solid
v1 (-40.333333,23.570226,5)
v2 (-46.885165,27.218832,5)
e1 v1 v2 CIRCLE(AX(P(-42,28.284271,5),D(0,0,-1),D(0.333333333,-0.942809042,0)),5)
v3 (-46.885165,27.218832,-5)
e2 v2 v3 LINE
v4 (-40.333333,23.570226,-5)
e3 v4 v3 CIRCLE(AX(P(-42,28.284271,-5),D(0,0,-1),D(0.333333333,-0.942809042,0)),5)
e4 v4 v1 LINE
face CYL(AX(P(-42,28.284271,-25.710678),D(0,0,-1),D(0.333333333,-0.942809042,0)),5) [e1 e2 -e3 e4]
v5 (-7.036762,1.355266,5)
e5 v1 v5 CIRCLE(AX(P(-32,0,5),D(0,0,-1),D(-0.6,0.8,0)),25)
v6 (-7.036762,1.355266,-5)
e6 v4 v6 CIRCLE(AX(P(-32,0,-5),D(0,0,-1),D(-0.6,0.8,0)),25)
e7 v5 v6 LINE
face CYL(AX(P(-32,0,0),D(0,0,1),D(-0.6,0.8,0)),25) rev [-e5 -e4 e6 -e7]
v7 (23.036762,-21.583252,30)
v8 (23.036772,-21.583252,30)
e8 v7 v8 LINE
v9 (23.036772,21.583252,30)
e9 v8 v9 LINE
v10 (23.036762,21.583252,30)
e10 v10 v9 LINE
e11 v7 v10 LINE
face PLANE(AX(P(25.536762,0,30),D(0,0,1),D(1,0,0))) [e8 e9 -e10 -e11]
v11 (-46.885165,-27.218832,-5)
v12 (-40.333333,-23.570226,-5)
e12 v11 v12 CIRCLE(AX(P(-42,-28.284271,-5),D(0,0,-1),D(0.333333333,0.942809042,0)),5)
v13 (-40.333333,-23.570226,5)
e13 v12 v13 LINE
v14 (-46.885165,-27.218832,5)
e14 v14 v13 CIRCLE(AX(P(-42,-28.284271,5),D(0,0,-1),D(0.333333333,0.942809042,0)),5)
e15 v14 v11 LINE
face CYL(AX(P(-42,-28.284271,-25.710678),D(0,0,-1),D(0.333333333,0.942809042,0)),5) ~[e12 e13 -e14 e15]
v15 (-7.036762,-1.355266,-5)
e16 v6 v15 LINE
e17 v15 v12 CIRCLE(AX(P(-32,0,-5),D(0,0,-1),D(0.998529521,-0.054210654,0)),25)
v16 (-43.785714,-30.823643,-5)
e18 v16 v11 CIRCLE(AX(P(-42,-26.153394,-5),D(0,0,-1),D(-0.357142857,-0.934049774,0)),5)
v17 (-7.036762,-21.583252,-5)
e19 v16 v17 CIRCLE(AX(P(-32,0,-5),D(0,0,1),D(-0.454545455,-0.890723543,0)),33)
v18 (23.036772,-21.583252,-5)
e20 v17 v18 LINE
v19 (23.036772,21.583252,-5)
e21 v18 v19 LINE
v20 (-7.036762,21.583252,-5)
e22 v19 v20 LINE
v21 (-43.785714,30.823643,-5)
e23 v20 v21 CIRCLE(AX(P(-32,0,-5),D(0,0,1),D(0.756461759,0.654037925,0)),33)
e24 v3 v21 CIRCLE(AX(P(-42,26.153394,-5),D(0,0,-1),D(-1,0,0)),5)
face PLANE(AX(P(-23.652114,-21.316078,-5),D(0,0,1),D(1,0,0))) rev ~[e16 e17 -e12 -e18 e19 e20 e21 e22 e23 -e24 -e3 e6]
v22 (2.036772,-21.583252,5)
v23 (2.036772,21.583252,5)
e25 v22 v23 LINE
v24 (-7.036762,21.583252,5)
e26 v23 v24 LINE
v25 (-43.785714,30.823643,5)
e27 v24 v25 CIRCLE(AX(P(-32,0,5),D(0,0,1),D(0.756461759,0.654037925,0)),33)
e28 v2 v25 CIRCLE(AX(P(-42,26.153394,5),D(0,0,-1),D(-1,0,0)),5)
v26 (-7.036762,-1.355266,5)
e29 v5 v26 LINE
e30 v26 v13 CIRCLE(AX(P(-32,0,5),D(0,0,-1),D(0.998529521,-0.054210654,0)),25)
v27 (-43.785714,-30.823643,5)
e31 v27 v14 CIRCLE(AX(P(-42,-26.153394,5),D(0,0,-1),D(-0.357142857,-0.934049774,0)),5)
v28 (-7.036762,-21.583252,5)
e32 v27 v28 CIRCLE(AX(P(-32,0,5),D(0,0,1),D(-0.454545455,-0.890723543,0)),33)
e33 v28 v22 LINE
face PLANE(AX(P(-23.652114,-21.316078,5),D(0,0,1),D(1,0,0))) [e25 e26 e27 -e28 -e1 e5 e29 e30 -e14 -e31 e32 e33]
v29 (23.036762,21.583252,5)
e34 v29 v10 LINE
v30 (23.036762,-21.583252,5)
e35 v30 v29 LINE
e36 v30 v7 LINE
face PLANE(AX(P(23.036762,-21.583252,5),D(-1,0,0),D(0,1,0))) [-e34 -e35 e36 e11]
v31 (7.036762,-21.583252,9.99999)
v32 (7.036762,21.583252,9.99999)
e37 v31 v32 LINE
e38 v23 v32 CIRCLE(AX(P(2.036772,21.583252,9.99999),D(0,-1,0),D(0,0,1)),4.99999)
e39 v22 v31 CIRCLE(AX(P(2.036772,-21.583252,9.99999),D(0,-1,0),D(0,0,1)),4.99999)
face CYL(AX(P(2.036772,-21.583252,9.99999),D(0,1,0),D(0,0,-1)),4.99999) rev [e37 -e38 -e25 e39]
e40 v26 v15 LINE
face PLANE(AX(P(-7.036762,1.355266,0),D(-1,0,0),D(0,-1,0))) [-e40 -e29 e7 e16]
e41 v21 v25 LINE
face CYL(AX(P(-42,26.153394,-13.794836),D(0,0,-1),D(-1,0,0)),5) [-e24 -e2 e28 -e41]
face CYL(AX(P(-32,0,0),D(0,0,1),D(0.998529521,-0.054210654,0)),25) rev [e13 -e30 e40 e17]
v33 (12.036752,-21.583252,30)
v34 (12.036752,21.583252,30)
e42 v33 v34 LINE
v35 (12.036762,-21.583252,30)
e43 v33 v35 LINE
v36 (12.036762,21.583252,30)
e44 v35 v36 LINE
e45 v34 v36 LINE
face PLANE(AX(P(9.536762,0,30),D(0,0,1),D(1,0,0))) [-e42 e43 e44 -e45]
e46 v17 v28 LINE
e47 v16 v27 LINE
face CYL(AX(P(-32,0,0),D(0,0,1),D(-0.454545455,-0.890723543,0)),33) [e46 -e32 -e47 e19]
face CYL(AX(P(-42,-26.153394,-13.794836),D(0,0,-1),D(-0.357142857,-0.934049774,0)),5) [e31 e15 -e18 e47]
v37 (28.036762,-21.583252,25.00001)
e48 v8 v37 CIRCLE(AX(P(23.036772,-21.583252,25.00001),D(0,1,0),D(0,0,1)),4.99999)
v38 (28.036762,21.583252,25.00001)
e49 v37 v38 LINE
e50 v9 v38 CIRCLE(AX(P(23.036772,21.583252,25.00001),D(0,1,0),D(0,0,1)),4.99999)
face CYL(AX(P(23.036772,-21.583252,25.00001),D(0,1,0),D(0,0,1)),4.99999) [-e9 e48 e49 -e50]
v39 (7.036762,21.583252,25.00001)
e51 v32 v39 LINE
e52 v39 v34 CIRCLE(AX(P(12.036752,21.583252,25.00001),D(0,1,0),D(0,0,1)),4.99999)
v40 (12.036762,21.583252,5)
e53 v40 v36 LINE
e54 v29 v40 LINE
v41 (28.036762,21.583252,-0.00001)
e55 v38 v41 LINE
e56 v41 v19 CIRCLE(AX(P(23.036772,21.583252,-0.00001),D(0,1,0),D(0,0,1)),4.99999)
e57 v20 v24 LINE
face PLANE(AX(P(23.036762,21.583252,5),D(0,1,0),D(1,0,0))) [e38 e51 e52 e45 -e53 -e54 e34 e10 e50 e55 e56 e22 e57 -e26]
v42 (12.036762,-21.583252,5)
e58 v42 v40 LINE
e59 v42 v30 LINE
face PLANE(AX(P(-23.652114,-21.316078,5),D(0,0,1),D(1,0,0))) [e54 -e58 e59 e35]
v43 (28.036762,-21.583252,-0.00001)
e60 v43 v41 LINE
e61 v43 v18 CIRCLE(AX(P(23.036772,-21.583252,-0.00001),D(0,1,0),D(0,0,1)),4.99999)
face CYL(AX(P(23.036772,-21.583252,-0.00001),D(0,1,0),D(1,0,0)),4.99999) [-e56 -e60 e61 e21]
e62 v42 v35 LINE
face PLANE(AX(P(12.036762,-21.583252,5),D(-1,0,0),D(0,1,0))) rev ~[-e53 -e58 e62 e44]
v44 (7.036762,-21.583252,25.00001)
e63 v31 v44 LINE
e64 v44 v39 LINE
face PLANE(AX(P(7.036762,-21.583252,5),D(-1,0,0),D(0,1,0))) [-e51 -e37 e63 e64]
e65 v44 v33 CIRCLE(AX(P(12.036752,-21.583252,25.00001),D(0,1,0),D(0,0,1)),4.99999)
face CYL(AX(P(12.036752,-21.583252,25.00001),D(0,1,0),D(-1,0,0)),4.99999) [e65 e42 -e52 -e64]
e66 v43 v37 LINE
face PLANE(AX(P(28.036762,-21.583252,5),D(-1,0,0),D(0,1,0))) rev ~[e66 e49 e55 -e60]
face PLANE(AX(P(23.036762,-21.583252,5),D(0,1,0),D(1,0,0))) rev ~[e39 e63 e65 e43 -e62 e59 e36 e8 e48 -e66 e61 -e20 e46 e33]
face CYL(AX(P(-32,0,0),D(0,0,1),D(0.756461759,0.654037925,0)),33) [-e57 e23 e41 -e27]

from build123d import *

# Parameters (mm, degrees)
F0_W          = 5
F0_H          = 43.1665030722
F0_W_2        = 11
F1_DEPTH      = 5
F1_DEPTH_BACK = 5
F2_T1_DEPTH   = 51.4213562373
F2_T3_DEPTH   = 27.589671948
F3_W          = 5
F3_H          = 43.1665030722
F4_DEPTH      = 25
F5_R          = 4.99999


# Not quite as in the source:
# - a fillet or chamfer that OpenCascade refuses, or shapes differently, is made with other operations: its cross-section is extruded or revolved along the edge and cut away or added
# - a fillet or chamfer is up to 0.001 mm smaller than in the source, because OpenCascade refuses the exact size
# - a feature names something its author has since deleted; it is built from what else it names


with BuildPart() as f1:
    # F0 (on Top) → F1 (new body, two sides)
    with BuildSketch(Plane.XY) as f1_sk:
        with BuildLine():
            ThreePointArc((-7.0367619663, -1.3552663468), (-21.4300874517, -22.6556162733), (-47, -20))
            Line((-47, -20), (-47, -29.3938769134))
            ThreePointArc((-47, -29.3938769134), (-25.6700714676, -32.3872197753), (-7.0367619663, -21.5832515361))
            Line((-7.0367619663, -21.5832515361), (-7.0367619663, -1.3552663468))
        make_face()
        with BuildLine():
            Line((-7.0367619663, 1.3552663468), (-7.0367619663, -1.3552663468))
            ThreePointArc((-7.0367619663, -1.3552663468), (-7, 0), (-7.0367619663, 1.3552663468))
        make_face()
        with BuildLine():
            ThreePointArc((-7.0367619663, 1.3552663468), (-7, 0), (-7.0367619663, -1.3552663468))
            Line((-7.0367619663, -1.3552663468), (-7.0367619663, -21.5832515361))
            ThreePointArc((-7.0367619663, -21.5832515361), (1, 0), (-7.0367619663, 21.5832515361))
            Line((-7.0367619663, 21.5832515361), (-7.0367619663, 1.3552663468))
        make_face()
        with BuildLine():
            ThreePointArc((-47, 20), (-21.4300874517, 22.6556162733), (-7.0367619663, 1.3552663468))
            Line((-7.0367619663, 1.3552663468), (-7.0367619663, 21.5832515361))
            ThreePointArc((-7.0367619663, 21.5832515361), (-25.6700714676, 32.3872197753), (-47, 29.3938769134))
            Line((-47, 29.3938769134), (-47, 20))
        make_face()
        with BuildLine():
            ThreePointArc((-7.0367619663, 21.5832515361), (1, 0), (-7.0367619663, -21.5832515361))
            Line((-7.0367619663, -21.5832515361), (7.0367619663, -21.5832515361))
            Line((7.0367619663, -21.5832515361), (7.0367619663, 21.5832515361))
            Line((7.0367619663, 21.5832515361), (-7.0367619663, 21.5832515361))
        make_face()
        with Locations((9.5367619663, 0)):
            Rectangle(F0_W, F0_H)
        with Locations((17.5367619663, 0)):
            Rectangle(F0_W_2, F0_H)
        with Locations((25.5367619663, 0)):
            Rectangle(F0_W, F0_H)
    extrude(amount=F1_DEPTH)
    extrude(f1_sk.sketch, amount=-F1_DEPTH_BACK)

    # F2: fillet of radius 5 on 4 edges, made by hand

    # F2_s2 → F2_t1 (cut)
    with BuildSketch(Plane.XY.offset(-25.7106781187)):
        with BuildLine():
            ThreePointArc((-40.3333333333, 23.5702260396), (-44.8867513459, 24.2017883428), (-47, 28.2842712475))
            Line((-47, 28.2842712475), (-47, 20))
            ThreePointArc((-47, 20), (-43.8024463398, 22.0386537791), (-40.3333333333, 23.5702260396))
        make_face()
        with BuildLine():
            ThreePointArc((-40.3333333333, -23.5702260396), (-44.8867513459, -24.2017883428), (-47, -28.2842712475))
            Line((-47, -28.2842712475), (-47, -20))
            ThreePointArc((-47, -20), (-43.8024463398, -22.0386537791), (-40.3333333333, -23.5702260396))
        make_face()
    extrude(amount=F2_T1_DEPTH, mode=Mode.SUBTRACT)

    # F2_s4 → F2_t3 (cut)
    with BuildSketch(Plane.XY.offset(-13.794835974)):
        with BuildLine():
            ThreePointArc((-43.7857142857, -30.8236425293), (-46.1187723552, -28.9881272088), (-47, -26.1533936612))
            Line((-47, -26.1533936612), (-47, -29.3938769134))
            ThreePointArc((-47, -29.3938769134), (-45.4119230492, -30.1516221806), (-43.7857142857, -30.8236425293))
        make_face()
        with BuildLine():
            ThreePointArc((-47, 26.1533936612), (-46.1187723552, 28.9881272088), (-43.7857142857, 30.8236425293))
            ThreePointArc((-43.7857142857, 30.8236425293), (-45.4119230492, 30.1516221806), (-47, 29.3938769134))
            Line((-47, 29.3938769134), (-47, 26.1533936612))
        make_face()
    extrude(amount=F2_T3_DEPTH, mode=Mode.SUBTRACT)

    # F3 (on face) → F4 (join)
    with BuildSketch(Plane.XY.offset(5)):
        with Locations((9.5367619663, 0)):
            Rectangle(F3_W, F3_H)
        with Locations((25.5367619663, 0)):
            Rectangle(F3_W, F3_H)
    extrude(amount=F4_DEPTH)

    # F5 (radius 5 in the source; OpenCascade refuses exactly that, so slightly less here)
    f5_edges = [f1.edges().sort_by_distance(p)[0] for p in [
        (7.036762, 0, 5),
        (7.036762, 0, 30),
        (28.036762, 0, 30),
        (28.036762, 0, -5),
    ]]
    fillet(f5_edges, radius=F5_R)


solid = f1.part
